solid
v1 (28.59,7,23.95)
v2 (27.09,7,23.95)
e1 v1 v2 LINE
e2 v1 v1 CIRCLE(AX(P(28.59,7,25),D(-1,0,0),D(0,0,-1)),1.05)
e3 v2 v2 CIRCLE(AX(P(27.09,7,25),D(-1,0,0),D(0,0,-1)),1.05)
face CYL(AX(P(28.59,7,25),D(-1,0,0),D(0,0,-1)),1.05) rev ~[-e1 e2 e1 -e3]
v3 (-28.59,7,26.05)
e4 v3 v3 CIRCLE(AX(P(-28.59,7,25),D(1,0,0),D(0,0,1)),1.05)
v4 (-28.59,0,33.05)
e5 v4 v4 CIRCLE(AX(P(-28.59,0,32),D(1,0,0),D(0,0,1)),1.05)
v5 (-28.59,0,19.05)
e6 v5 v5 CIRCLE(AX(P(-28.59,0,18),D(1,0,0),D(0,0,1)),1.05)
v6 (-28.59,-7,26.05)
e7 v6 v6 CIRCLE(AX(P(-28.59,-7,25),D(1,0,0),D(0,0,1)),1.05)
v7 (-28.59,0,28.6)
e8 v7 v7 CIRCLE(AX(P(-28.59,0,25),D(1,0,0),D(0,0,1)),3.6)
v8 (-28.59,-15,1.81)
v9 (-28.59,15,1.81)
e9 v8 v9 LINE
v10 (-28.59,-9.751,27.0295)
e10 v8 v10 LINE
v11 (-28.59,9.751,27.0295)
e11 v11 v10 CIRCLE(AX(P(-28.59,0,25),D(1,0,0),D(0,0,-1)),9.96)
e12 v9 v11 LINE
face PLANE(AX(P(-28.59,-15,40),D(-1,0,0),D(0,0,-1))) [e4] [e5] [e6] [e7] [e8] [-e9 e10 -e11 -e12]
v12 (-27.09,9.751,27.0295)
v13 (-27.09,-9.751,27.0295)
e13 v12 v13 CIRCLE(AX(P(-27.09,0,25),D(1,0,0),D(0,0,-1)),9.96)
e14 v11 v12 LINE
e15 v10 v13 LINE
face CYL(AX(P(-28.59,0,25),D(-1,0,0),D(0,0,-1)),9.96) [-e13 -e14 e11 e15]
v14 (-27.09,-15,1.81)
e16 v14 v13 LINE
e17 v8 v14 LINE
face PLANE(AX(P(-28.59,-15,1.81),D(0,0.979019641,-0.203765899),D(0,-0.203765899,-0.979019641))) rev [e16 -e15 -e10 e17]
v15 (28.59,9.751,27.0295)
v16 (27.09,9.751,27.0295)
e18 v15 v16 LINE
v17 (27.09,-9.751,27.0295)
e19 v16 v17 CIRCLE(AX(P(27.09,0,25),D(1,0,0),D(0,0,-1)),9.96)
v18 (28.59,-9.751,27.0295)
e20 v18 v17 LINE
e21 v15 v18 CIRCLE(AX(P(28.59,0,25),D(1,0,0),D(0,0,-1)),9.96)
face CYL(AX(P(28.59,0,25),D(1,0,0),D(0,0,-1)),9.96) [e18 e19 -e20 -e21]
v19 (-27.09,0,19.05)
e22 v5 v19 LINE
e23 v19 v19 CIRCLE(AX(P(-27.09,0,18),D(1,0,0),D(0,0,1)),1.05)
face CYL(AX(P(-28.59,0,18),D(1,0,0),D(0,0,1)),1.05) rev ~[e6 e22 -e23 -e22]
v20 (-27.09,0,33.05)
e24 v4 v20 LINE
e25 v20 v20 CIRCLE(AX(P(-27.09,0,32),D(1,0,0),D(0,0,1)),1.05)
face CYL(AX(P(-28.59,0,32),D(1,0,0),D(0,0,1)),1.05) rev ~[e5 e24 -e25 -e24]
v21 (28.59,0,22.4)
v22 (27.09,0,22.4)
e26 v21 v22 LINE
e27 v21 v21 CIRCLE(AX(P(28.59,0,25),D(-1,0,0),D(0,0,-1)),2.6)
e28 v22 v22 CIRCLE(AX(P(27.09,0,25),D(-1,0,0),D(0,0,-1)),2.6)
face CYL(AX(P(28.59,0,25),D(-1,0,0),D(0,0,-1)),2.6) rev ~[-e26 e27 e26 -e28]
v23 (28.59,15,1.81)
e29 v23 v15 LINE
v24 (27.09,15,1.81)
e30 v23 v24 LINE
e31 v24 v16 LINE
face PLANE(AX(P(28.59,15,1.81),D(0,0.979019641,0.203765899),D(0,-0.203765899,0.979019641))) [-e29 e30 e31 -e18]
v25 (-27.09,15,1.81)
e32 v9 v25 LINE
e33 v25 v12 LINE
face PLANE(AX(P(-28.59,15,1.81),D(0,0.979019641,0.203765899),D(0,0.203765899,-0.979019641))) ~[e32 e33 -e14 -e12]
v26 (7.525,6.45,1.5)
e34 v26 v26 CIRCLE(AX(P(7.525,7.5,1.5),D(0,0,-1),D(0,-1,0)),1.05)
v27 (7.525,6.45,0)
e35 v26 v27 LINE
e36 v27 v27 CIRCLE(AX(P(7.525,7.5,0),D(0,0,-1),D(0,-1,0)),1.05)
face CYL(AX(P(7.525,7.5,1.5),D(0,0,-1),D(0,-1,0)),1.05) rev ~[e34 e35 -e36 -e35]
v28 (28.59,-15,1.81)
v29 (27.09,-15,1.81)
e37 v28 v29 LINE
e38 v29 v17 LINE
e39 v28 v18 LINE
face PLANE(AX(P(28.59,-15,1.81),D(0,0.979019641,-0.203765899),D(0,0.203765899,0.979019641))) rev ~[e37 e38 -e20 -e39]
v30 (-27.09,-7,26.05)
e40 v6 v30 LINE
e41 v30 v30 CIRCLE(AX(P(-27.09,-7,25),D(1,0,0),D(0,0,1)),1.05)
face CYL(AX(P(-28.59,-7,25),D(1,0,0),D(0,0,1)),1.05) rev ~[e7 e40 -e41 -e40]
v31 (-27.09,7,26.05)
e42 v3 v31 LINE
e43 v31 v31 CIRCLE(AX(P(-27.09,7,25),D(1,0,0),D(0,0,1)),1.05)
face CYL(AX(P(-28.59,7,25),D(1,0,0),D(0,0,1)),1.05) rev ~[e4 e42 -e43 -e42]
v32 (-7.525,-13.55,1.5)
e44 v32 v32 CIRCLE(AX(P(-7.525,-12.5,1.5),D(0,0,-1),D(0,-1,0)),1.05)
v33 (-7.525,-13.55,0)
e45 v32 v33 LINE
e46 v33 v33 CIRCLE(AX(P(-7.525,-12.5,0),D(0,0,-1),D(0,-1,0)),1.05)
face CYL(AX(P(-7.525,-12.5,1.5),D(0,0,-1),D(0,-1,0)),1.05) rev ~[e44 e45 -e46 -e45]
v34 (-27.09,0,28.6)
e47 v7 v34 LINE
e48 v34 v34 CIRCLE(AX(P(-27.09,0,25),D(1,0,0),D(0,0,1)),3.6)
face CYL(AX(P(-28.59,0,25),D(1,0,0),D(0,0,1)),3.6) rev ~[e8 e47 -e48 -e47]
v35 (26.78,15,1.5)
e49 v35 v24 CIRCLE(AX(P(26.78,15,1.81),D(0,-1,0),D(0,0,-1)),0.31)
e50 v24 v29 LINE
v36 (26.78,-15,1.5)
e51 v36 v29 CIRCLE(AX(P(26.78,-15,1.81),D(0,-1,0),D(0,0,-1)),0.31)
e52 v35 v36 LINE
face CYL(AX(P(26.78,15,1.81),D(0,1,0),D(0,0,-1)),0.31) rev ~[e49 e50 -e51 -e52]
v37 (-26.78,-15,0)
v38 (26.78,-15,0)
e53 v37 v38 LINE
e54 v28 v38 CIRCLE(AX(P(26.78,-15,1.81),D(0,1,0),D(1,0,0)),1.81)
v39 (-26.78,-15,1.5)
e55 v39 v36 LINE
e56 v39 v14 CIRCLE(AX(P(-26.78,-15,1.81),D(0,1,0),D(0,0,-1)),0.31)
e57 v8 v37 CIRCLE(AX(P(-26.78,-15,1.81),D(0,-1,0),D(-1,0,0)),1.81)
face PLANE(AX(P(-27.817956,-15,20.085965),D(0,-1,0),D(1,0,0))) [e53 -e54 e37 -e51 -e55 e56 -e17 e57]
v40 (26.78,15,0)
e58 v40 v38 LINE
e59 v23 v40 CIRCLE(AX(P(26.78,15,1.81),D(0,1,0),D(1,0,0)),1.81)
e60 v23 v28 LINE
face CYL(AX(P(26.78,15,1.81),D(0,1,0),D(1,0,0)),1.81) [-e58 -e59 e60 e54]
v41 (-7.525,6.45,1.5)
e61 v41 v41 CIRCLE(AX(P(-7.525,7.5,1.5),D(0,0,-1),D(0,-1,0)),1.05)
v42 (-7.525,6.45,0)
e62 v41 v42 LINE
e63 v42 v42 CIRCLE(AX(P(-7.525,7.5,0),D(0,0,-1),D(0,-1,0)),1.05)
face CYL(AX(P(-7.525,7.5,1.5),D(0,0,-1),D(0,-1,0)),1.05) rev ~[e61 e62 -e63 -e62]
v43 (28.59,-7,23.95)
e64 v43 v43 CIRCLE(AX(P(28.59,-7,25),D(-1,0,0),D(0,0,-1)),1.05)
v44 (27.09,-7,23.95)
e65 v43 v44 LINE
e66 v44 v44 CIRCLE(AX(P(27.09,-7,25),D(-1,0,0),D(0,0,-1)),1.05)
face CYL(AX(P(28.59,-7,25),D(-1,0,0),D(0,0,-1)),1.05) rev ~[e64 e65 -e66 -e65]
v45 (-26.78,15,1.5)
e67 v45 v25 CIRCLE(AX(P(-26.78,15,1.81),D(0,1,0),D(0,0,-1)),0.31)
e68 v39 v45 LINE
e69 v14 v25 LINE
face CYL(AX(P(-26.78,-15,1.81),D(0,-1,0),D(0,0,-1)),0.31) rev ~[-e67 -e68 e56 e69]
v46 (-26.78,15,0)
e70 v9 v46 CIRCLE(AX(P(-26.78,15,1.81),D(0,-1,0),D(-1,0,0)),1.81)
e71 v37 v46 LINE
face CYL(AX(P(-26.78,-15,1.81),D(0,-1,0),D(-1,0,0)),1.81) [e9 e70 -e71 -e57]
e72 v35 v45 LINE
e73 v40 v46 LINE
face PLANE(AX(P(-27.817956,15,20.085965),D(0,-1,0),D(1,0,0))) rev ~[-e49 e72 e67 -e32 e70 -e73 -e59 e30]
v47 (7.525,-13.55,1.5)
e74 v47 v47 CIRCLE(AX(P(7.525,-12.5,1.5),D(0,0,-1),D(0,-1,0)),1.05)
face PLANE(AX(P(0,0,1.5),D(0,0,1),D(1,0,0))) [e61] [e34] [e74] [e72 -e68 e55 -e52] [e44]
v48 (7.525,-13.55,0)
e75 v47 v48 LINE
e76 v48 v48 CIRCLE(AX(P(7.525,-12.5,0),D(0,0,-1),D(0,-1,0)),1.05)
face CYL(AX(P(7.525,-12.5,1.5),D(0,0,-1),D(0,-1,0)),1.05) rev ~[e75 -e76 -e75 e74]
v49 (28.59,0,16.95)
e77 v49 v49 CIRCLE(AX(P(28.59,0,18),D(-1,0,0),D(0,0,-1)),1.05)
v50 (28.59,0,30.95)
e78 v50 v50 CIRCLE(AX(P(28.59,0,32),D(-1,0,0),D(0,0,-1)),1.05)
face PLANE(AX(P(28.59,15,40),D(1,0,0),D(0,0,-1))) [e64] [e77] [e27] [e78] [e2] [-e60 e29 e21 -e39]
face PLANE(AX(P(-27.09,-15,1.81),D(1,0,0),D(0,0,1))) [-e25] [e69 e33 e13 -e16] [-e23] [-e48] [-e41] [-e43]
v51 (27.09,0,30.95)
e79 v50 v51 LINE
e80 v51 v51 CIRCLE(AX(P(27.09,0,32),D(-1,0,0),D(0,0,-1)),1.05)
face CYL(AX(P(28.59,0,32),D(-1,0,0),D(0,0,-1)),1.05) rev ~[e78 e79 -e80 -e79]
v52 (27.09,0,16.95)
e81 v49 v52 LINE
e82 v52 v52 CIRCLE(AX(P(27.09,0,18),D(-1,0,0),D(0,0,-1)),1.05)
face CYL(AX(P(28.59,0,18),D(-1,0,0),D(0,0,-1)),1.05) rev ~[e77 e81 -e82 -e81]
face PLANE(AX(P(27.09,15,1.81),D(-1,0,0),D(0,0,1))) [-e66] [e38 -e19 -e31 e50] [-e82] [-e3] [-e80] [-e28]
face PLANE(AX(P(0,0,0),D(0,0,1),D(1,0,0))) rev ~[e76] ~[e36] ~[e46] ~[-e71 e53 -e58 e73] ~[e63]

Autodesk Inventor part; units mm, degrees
ref_plane "YZ Plane" through (0, 0, 0) normal (1, 0, 0) x (0, 1, 0)
ref_plane "XZ Plane" through (0, 0, 0) normal (0, 1, 0) x (-1, 0, 0)
ref_plane "XY Plane" through (0, 0, 0) normal (0, 0, 1) x (1, 0, 0)
sketch "Sketch1" plane through (0, 0, 0) normal (0, 0, 1) x (1, 0, 0)
  line L0 (-28.59, -15) -> (28.59, -15)
  line L1 (28.59, -15) -> (28.59, 15)
  line L2 (28.59, 15) -> (-28.59, 15)
  line L3 (-28.59, 15) -> (-28.59, -15)
  line L4 (-28.59, -15) -> (28.59, 15) construction
  line L5 (28.59, -15) -> (-28.59, 15) construction
  point P0 (0, 0)
  dimension "d0" = 57.18
  dimension "d1" = 30
extrude "Plate1" add sketch "Sketch1" along normal blind 1.5
sketch "Sketch2" plane through (-27.09, -15, 0) normal (-1, 0, 0) x (0, -1, 0)
  line L0 (-30, 0) -> (0, 0)
  line L1 (0, 0) -> (0, 40)
  line L2 (0, 40) -> (-30, 40)
  line L3 (-30, 40) -> (-30, 0)
edge flange "Flange1" height 40 angle 90 thickness 1.5 bend radius 0.31 thickness toward (-1, 0, 0) relief tear relief width 1.5 relief depth 0.75 corner gap 0.31 corner form 0 edges at (-28.59, 0, 1.5) (28.59, 0, 1.5) wall of the first edge with corners at (-27.09, 15, 0) (-27.09, -15, 0) (-27.09, -15, 40) (-27.09, 15, 40)
bend "Bend1"
corner "Corner1"
sketch "Sketch3" plane through (28.59, -15, 40) normal (1, 0, 0) x (0, 0, -1)
  circle A0 centre (15, 15) radius 9.96
  line L0 (0, 30) -> (38.19, 30) projected
  line L1 (38.19, 0) -> (0, 0) projected
  line L2 (38.19, 30) -> (12.9705, 24.751)
  line L3 (38.19, 0) -> (12.9705, 5.249)
  line L4 (0, 30) -> (0, 0)
  point P0 (40, 15)
  dimension "d13" = 19.92
  dimension "d14" = 0
  dimension "d15" = 25
sketch "Sketch19" plane through (0, 0, 1.5) normal (0, 0, 1) x (1, 0, 0)
  point P0 (0, 0)
sketch "Sketch21" plane through (-28.59, -15, 1.81) normal (-1, 0, 0) x (0, 0, 1)
  point P0 (-1.81, 15)
sketch "Sketch23" plane through (-28.59, -15, 1.81) normal (-1, 0, 0) x (0, 0, 1)
  point P0 (-1.81, 15)
sketch "Sketch25" plane through (0, 0, 1.5) normal (0, 0, 1) x (1, 0, 0)
  circle A0 centre (7.525, 7.5) radius 0.7835
  circle A1 centre (7.525, -12.5) radius 0.7835
  circle A2 centre (-7.525, -12.5) radius 0.7835
  circle A3 centre (-7.525, 7.5) radius 0.7835
  point P0 (0, 0)
hole "Hole12" at (7.525, 7.5, 1.5) at (7.525, -12.5, 1.5) at (-7.525, 7.5, 1.5) at (-7.525, -12.5, 1.5) direction (0, 0, -1) diameter 2.1 depth 1.5
extrude "Cut7" cut sketch "Sketch3" against normal blind 1.5 contours A0 L3 L1 L4 L0 L2
mirror "Mirror1" about plane through (0, 0, 0) normal (1, 0, 0) of "Cut7"
sketch "Sketch26" plane through (-28.59, -15, 1.81) normal (-1, 0, 0) x (0, 0, 1)
  circle A0 centre (30.19, 15) radius 0.7835 projected
  circle A1 centre (23.19, 22) radius 0.7835 projected
  circle A2 centre (23.19, 8) radius 0.7835 projected
  circle A3 centre (16.19, 15) radius 0.7835 projected
  point P0 (-1.81, 15)
hole "Hole13" at (-28.59, 0, 32) at (-28.59, 7, 25) at (-28.59, -7, 25) at (-28.59, 0, 18) direction (1, 0, 0) diameter 2.1 depth 1.5
sketch "Sketch27" plane through (-28.59, -15, 1.81) normal (-1, 0, 0) x (0, 0, 1)
  circle A0 centre (23.19, 15) radius 3 projected
  point P0 (-1.81, 15)
hole "Hole14" at (-28.59, 0, 25) direction (1, 0, 0) diameter 7.2 depth 1.5
sketch "Sketch28" plane through (28.59, -15, 1.81) normal (1, 0, 0) x (0, 0, -1)
  circle A0 centre (-30.19, 15) radius 0.7835 projected
  circle A1 centre (-23.19, 8) radius 0.7835 projected
  circle A2 centre (-23.19, 22) radius 0.7835 projected
  circle A3 centre (-16.19, 15) radius 0.7835 projected
  point P0 (1.81, 15)
hole "Hole15" at (28.59, 0, 32) at (28.59, -7, 25) at (28.59, 0, 18) at (28.59, 7, 25) direction (-1, 0, 0) diameter 2.1 depth 1.5
sketch "Sketch29" plane through (28.59, -15, 1.81) normal (1, 0, 0) x (0, 0, -1)
  circle A0 centre (-23.19, 15) radius 1.75 projected
  point P0 (1.81, 15)
hole "Hole16" at (28.59, 0, 25) direction (-1, 0, 0) diameter 5.2 depth 1.5
equation "\"d125\" = Thickness"
equation "\"d127\" = Thickness"
equation "\"d134\" = Thickness"
equation "\"d141\" = Thickness"
equation "\"d148\" = Thickness"
equation "\"d155\" = Thickness"
equation "\"d2\" = Thickness"
equation "\"d3\" = BendReliefWidth"
equation "\"d4\" = BendReliefDepth"
equation "\"d5\" = MinimumRemnant"
equation "\"d6\" = TransitionRadius"
equation "\"d9\" = BendRadius"
equation "\"d10\" = CornerReliefSize"
equation "\"d11\" = GapSize"
equation "\"d12\" = JacobiRadiusSize"
equation "\"BendReliefWidth\" = Thickness"
equation "\"BendReliefDepth\" = 0.5 * Thickness"
equation "\"CornerReliefSize\" = 4 * Thickness"
equation "\"MinimumRemnant\" = 2 * Thickness"
equation "\"TransitionRadius\" = BendRadius"
equation "\"JacobiRadiusSize\" = BendRadius"
equation "\"GapSize\" = Thickness"
equation "\"Thickness\" = 1.5"
equation "\"BendRadius\" = 0.31"
properties part number "axis_14_bottom_frame" material "Aluminum 6061-AHC"
